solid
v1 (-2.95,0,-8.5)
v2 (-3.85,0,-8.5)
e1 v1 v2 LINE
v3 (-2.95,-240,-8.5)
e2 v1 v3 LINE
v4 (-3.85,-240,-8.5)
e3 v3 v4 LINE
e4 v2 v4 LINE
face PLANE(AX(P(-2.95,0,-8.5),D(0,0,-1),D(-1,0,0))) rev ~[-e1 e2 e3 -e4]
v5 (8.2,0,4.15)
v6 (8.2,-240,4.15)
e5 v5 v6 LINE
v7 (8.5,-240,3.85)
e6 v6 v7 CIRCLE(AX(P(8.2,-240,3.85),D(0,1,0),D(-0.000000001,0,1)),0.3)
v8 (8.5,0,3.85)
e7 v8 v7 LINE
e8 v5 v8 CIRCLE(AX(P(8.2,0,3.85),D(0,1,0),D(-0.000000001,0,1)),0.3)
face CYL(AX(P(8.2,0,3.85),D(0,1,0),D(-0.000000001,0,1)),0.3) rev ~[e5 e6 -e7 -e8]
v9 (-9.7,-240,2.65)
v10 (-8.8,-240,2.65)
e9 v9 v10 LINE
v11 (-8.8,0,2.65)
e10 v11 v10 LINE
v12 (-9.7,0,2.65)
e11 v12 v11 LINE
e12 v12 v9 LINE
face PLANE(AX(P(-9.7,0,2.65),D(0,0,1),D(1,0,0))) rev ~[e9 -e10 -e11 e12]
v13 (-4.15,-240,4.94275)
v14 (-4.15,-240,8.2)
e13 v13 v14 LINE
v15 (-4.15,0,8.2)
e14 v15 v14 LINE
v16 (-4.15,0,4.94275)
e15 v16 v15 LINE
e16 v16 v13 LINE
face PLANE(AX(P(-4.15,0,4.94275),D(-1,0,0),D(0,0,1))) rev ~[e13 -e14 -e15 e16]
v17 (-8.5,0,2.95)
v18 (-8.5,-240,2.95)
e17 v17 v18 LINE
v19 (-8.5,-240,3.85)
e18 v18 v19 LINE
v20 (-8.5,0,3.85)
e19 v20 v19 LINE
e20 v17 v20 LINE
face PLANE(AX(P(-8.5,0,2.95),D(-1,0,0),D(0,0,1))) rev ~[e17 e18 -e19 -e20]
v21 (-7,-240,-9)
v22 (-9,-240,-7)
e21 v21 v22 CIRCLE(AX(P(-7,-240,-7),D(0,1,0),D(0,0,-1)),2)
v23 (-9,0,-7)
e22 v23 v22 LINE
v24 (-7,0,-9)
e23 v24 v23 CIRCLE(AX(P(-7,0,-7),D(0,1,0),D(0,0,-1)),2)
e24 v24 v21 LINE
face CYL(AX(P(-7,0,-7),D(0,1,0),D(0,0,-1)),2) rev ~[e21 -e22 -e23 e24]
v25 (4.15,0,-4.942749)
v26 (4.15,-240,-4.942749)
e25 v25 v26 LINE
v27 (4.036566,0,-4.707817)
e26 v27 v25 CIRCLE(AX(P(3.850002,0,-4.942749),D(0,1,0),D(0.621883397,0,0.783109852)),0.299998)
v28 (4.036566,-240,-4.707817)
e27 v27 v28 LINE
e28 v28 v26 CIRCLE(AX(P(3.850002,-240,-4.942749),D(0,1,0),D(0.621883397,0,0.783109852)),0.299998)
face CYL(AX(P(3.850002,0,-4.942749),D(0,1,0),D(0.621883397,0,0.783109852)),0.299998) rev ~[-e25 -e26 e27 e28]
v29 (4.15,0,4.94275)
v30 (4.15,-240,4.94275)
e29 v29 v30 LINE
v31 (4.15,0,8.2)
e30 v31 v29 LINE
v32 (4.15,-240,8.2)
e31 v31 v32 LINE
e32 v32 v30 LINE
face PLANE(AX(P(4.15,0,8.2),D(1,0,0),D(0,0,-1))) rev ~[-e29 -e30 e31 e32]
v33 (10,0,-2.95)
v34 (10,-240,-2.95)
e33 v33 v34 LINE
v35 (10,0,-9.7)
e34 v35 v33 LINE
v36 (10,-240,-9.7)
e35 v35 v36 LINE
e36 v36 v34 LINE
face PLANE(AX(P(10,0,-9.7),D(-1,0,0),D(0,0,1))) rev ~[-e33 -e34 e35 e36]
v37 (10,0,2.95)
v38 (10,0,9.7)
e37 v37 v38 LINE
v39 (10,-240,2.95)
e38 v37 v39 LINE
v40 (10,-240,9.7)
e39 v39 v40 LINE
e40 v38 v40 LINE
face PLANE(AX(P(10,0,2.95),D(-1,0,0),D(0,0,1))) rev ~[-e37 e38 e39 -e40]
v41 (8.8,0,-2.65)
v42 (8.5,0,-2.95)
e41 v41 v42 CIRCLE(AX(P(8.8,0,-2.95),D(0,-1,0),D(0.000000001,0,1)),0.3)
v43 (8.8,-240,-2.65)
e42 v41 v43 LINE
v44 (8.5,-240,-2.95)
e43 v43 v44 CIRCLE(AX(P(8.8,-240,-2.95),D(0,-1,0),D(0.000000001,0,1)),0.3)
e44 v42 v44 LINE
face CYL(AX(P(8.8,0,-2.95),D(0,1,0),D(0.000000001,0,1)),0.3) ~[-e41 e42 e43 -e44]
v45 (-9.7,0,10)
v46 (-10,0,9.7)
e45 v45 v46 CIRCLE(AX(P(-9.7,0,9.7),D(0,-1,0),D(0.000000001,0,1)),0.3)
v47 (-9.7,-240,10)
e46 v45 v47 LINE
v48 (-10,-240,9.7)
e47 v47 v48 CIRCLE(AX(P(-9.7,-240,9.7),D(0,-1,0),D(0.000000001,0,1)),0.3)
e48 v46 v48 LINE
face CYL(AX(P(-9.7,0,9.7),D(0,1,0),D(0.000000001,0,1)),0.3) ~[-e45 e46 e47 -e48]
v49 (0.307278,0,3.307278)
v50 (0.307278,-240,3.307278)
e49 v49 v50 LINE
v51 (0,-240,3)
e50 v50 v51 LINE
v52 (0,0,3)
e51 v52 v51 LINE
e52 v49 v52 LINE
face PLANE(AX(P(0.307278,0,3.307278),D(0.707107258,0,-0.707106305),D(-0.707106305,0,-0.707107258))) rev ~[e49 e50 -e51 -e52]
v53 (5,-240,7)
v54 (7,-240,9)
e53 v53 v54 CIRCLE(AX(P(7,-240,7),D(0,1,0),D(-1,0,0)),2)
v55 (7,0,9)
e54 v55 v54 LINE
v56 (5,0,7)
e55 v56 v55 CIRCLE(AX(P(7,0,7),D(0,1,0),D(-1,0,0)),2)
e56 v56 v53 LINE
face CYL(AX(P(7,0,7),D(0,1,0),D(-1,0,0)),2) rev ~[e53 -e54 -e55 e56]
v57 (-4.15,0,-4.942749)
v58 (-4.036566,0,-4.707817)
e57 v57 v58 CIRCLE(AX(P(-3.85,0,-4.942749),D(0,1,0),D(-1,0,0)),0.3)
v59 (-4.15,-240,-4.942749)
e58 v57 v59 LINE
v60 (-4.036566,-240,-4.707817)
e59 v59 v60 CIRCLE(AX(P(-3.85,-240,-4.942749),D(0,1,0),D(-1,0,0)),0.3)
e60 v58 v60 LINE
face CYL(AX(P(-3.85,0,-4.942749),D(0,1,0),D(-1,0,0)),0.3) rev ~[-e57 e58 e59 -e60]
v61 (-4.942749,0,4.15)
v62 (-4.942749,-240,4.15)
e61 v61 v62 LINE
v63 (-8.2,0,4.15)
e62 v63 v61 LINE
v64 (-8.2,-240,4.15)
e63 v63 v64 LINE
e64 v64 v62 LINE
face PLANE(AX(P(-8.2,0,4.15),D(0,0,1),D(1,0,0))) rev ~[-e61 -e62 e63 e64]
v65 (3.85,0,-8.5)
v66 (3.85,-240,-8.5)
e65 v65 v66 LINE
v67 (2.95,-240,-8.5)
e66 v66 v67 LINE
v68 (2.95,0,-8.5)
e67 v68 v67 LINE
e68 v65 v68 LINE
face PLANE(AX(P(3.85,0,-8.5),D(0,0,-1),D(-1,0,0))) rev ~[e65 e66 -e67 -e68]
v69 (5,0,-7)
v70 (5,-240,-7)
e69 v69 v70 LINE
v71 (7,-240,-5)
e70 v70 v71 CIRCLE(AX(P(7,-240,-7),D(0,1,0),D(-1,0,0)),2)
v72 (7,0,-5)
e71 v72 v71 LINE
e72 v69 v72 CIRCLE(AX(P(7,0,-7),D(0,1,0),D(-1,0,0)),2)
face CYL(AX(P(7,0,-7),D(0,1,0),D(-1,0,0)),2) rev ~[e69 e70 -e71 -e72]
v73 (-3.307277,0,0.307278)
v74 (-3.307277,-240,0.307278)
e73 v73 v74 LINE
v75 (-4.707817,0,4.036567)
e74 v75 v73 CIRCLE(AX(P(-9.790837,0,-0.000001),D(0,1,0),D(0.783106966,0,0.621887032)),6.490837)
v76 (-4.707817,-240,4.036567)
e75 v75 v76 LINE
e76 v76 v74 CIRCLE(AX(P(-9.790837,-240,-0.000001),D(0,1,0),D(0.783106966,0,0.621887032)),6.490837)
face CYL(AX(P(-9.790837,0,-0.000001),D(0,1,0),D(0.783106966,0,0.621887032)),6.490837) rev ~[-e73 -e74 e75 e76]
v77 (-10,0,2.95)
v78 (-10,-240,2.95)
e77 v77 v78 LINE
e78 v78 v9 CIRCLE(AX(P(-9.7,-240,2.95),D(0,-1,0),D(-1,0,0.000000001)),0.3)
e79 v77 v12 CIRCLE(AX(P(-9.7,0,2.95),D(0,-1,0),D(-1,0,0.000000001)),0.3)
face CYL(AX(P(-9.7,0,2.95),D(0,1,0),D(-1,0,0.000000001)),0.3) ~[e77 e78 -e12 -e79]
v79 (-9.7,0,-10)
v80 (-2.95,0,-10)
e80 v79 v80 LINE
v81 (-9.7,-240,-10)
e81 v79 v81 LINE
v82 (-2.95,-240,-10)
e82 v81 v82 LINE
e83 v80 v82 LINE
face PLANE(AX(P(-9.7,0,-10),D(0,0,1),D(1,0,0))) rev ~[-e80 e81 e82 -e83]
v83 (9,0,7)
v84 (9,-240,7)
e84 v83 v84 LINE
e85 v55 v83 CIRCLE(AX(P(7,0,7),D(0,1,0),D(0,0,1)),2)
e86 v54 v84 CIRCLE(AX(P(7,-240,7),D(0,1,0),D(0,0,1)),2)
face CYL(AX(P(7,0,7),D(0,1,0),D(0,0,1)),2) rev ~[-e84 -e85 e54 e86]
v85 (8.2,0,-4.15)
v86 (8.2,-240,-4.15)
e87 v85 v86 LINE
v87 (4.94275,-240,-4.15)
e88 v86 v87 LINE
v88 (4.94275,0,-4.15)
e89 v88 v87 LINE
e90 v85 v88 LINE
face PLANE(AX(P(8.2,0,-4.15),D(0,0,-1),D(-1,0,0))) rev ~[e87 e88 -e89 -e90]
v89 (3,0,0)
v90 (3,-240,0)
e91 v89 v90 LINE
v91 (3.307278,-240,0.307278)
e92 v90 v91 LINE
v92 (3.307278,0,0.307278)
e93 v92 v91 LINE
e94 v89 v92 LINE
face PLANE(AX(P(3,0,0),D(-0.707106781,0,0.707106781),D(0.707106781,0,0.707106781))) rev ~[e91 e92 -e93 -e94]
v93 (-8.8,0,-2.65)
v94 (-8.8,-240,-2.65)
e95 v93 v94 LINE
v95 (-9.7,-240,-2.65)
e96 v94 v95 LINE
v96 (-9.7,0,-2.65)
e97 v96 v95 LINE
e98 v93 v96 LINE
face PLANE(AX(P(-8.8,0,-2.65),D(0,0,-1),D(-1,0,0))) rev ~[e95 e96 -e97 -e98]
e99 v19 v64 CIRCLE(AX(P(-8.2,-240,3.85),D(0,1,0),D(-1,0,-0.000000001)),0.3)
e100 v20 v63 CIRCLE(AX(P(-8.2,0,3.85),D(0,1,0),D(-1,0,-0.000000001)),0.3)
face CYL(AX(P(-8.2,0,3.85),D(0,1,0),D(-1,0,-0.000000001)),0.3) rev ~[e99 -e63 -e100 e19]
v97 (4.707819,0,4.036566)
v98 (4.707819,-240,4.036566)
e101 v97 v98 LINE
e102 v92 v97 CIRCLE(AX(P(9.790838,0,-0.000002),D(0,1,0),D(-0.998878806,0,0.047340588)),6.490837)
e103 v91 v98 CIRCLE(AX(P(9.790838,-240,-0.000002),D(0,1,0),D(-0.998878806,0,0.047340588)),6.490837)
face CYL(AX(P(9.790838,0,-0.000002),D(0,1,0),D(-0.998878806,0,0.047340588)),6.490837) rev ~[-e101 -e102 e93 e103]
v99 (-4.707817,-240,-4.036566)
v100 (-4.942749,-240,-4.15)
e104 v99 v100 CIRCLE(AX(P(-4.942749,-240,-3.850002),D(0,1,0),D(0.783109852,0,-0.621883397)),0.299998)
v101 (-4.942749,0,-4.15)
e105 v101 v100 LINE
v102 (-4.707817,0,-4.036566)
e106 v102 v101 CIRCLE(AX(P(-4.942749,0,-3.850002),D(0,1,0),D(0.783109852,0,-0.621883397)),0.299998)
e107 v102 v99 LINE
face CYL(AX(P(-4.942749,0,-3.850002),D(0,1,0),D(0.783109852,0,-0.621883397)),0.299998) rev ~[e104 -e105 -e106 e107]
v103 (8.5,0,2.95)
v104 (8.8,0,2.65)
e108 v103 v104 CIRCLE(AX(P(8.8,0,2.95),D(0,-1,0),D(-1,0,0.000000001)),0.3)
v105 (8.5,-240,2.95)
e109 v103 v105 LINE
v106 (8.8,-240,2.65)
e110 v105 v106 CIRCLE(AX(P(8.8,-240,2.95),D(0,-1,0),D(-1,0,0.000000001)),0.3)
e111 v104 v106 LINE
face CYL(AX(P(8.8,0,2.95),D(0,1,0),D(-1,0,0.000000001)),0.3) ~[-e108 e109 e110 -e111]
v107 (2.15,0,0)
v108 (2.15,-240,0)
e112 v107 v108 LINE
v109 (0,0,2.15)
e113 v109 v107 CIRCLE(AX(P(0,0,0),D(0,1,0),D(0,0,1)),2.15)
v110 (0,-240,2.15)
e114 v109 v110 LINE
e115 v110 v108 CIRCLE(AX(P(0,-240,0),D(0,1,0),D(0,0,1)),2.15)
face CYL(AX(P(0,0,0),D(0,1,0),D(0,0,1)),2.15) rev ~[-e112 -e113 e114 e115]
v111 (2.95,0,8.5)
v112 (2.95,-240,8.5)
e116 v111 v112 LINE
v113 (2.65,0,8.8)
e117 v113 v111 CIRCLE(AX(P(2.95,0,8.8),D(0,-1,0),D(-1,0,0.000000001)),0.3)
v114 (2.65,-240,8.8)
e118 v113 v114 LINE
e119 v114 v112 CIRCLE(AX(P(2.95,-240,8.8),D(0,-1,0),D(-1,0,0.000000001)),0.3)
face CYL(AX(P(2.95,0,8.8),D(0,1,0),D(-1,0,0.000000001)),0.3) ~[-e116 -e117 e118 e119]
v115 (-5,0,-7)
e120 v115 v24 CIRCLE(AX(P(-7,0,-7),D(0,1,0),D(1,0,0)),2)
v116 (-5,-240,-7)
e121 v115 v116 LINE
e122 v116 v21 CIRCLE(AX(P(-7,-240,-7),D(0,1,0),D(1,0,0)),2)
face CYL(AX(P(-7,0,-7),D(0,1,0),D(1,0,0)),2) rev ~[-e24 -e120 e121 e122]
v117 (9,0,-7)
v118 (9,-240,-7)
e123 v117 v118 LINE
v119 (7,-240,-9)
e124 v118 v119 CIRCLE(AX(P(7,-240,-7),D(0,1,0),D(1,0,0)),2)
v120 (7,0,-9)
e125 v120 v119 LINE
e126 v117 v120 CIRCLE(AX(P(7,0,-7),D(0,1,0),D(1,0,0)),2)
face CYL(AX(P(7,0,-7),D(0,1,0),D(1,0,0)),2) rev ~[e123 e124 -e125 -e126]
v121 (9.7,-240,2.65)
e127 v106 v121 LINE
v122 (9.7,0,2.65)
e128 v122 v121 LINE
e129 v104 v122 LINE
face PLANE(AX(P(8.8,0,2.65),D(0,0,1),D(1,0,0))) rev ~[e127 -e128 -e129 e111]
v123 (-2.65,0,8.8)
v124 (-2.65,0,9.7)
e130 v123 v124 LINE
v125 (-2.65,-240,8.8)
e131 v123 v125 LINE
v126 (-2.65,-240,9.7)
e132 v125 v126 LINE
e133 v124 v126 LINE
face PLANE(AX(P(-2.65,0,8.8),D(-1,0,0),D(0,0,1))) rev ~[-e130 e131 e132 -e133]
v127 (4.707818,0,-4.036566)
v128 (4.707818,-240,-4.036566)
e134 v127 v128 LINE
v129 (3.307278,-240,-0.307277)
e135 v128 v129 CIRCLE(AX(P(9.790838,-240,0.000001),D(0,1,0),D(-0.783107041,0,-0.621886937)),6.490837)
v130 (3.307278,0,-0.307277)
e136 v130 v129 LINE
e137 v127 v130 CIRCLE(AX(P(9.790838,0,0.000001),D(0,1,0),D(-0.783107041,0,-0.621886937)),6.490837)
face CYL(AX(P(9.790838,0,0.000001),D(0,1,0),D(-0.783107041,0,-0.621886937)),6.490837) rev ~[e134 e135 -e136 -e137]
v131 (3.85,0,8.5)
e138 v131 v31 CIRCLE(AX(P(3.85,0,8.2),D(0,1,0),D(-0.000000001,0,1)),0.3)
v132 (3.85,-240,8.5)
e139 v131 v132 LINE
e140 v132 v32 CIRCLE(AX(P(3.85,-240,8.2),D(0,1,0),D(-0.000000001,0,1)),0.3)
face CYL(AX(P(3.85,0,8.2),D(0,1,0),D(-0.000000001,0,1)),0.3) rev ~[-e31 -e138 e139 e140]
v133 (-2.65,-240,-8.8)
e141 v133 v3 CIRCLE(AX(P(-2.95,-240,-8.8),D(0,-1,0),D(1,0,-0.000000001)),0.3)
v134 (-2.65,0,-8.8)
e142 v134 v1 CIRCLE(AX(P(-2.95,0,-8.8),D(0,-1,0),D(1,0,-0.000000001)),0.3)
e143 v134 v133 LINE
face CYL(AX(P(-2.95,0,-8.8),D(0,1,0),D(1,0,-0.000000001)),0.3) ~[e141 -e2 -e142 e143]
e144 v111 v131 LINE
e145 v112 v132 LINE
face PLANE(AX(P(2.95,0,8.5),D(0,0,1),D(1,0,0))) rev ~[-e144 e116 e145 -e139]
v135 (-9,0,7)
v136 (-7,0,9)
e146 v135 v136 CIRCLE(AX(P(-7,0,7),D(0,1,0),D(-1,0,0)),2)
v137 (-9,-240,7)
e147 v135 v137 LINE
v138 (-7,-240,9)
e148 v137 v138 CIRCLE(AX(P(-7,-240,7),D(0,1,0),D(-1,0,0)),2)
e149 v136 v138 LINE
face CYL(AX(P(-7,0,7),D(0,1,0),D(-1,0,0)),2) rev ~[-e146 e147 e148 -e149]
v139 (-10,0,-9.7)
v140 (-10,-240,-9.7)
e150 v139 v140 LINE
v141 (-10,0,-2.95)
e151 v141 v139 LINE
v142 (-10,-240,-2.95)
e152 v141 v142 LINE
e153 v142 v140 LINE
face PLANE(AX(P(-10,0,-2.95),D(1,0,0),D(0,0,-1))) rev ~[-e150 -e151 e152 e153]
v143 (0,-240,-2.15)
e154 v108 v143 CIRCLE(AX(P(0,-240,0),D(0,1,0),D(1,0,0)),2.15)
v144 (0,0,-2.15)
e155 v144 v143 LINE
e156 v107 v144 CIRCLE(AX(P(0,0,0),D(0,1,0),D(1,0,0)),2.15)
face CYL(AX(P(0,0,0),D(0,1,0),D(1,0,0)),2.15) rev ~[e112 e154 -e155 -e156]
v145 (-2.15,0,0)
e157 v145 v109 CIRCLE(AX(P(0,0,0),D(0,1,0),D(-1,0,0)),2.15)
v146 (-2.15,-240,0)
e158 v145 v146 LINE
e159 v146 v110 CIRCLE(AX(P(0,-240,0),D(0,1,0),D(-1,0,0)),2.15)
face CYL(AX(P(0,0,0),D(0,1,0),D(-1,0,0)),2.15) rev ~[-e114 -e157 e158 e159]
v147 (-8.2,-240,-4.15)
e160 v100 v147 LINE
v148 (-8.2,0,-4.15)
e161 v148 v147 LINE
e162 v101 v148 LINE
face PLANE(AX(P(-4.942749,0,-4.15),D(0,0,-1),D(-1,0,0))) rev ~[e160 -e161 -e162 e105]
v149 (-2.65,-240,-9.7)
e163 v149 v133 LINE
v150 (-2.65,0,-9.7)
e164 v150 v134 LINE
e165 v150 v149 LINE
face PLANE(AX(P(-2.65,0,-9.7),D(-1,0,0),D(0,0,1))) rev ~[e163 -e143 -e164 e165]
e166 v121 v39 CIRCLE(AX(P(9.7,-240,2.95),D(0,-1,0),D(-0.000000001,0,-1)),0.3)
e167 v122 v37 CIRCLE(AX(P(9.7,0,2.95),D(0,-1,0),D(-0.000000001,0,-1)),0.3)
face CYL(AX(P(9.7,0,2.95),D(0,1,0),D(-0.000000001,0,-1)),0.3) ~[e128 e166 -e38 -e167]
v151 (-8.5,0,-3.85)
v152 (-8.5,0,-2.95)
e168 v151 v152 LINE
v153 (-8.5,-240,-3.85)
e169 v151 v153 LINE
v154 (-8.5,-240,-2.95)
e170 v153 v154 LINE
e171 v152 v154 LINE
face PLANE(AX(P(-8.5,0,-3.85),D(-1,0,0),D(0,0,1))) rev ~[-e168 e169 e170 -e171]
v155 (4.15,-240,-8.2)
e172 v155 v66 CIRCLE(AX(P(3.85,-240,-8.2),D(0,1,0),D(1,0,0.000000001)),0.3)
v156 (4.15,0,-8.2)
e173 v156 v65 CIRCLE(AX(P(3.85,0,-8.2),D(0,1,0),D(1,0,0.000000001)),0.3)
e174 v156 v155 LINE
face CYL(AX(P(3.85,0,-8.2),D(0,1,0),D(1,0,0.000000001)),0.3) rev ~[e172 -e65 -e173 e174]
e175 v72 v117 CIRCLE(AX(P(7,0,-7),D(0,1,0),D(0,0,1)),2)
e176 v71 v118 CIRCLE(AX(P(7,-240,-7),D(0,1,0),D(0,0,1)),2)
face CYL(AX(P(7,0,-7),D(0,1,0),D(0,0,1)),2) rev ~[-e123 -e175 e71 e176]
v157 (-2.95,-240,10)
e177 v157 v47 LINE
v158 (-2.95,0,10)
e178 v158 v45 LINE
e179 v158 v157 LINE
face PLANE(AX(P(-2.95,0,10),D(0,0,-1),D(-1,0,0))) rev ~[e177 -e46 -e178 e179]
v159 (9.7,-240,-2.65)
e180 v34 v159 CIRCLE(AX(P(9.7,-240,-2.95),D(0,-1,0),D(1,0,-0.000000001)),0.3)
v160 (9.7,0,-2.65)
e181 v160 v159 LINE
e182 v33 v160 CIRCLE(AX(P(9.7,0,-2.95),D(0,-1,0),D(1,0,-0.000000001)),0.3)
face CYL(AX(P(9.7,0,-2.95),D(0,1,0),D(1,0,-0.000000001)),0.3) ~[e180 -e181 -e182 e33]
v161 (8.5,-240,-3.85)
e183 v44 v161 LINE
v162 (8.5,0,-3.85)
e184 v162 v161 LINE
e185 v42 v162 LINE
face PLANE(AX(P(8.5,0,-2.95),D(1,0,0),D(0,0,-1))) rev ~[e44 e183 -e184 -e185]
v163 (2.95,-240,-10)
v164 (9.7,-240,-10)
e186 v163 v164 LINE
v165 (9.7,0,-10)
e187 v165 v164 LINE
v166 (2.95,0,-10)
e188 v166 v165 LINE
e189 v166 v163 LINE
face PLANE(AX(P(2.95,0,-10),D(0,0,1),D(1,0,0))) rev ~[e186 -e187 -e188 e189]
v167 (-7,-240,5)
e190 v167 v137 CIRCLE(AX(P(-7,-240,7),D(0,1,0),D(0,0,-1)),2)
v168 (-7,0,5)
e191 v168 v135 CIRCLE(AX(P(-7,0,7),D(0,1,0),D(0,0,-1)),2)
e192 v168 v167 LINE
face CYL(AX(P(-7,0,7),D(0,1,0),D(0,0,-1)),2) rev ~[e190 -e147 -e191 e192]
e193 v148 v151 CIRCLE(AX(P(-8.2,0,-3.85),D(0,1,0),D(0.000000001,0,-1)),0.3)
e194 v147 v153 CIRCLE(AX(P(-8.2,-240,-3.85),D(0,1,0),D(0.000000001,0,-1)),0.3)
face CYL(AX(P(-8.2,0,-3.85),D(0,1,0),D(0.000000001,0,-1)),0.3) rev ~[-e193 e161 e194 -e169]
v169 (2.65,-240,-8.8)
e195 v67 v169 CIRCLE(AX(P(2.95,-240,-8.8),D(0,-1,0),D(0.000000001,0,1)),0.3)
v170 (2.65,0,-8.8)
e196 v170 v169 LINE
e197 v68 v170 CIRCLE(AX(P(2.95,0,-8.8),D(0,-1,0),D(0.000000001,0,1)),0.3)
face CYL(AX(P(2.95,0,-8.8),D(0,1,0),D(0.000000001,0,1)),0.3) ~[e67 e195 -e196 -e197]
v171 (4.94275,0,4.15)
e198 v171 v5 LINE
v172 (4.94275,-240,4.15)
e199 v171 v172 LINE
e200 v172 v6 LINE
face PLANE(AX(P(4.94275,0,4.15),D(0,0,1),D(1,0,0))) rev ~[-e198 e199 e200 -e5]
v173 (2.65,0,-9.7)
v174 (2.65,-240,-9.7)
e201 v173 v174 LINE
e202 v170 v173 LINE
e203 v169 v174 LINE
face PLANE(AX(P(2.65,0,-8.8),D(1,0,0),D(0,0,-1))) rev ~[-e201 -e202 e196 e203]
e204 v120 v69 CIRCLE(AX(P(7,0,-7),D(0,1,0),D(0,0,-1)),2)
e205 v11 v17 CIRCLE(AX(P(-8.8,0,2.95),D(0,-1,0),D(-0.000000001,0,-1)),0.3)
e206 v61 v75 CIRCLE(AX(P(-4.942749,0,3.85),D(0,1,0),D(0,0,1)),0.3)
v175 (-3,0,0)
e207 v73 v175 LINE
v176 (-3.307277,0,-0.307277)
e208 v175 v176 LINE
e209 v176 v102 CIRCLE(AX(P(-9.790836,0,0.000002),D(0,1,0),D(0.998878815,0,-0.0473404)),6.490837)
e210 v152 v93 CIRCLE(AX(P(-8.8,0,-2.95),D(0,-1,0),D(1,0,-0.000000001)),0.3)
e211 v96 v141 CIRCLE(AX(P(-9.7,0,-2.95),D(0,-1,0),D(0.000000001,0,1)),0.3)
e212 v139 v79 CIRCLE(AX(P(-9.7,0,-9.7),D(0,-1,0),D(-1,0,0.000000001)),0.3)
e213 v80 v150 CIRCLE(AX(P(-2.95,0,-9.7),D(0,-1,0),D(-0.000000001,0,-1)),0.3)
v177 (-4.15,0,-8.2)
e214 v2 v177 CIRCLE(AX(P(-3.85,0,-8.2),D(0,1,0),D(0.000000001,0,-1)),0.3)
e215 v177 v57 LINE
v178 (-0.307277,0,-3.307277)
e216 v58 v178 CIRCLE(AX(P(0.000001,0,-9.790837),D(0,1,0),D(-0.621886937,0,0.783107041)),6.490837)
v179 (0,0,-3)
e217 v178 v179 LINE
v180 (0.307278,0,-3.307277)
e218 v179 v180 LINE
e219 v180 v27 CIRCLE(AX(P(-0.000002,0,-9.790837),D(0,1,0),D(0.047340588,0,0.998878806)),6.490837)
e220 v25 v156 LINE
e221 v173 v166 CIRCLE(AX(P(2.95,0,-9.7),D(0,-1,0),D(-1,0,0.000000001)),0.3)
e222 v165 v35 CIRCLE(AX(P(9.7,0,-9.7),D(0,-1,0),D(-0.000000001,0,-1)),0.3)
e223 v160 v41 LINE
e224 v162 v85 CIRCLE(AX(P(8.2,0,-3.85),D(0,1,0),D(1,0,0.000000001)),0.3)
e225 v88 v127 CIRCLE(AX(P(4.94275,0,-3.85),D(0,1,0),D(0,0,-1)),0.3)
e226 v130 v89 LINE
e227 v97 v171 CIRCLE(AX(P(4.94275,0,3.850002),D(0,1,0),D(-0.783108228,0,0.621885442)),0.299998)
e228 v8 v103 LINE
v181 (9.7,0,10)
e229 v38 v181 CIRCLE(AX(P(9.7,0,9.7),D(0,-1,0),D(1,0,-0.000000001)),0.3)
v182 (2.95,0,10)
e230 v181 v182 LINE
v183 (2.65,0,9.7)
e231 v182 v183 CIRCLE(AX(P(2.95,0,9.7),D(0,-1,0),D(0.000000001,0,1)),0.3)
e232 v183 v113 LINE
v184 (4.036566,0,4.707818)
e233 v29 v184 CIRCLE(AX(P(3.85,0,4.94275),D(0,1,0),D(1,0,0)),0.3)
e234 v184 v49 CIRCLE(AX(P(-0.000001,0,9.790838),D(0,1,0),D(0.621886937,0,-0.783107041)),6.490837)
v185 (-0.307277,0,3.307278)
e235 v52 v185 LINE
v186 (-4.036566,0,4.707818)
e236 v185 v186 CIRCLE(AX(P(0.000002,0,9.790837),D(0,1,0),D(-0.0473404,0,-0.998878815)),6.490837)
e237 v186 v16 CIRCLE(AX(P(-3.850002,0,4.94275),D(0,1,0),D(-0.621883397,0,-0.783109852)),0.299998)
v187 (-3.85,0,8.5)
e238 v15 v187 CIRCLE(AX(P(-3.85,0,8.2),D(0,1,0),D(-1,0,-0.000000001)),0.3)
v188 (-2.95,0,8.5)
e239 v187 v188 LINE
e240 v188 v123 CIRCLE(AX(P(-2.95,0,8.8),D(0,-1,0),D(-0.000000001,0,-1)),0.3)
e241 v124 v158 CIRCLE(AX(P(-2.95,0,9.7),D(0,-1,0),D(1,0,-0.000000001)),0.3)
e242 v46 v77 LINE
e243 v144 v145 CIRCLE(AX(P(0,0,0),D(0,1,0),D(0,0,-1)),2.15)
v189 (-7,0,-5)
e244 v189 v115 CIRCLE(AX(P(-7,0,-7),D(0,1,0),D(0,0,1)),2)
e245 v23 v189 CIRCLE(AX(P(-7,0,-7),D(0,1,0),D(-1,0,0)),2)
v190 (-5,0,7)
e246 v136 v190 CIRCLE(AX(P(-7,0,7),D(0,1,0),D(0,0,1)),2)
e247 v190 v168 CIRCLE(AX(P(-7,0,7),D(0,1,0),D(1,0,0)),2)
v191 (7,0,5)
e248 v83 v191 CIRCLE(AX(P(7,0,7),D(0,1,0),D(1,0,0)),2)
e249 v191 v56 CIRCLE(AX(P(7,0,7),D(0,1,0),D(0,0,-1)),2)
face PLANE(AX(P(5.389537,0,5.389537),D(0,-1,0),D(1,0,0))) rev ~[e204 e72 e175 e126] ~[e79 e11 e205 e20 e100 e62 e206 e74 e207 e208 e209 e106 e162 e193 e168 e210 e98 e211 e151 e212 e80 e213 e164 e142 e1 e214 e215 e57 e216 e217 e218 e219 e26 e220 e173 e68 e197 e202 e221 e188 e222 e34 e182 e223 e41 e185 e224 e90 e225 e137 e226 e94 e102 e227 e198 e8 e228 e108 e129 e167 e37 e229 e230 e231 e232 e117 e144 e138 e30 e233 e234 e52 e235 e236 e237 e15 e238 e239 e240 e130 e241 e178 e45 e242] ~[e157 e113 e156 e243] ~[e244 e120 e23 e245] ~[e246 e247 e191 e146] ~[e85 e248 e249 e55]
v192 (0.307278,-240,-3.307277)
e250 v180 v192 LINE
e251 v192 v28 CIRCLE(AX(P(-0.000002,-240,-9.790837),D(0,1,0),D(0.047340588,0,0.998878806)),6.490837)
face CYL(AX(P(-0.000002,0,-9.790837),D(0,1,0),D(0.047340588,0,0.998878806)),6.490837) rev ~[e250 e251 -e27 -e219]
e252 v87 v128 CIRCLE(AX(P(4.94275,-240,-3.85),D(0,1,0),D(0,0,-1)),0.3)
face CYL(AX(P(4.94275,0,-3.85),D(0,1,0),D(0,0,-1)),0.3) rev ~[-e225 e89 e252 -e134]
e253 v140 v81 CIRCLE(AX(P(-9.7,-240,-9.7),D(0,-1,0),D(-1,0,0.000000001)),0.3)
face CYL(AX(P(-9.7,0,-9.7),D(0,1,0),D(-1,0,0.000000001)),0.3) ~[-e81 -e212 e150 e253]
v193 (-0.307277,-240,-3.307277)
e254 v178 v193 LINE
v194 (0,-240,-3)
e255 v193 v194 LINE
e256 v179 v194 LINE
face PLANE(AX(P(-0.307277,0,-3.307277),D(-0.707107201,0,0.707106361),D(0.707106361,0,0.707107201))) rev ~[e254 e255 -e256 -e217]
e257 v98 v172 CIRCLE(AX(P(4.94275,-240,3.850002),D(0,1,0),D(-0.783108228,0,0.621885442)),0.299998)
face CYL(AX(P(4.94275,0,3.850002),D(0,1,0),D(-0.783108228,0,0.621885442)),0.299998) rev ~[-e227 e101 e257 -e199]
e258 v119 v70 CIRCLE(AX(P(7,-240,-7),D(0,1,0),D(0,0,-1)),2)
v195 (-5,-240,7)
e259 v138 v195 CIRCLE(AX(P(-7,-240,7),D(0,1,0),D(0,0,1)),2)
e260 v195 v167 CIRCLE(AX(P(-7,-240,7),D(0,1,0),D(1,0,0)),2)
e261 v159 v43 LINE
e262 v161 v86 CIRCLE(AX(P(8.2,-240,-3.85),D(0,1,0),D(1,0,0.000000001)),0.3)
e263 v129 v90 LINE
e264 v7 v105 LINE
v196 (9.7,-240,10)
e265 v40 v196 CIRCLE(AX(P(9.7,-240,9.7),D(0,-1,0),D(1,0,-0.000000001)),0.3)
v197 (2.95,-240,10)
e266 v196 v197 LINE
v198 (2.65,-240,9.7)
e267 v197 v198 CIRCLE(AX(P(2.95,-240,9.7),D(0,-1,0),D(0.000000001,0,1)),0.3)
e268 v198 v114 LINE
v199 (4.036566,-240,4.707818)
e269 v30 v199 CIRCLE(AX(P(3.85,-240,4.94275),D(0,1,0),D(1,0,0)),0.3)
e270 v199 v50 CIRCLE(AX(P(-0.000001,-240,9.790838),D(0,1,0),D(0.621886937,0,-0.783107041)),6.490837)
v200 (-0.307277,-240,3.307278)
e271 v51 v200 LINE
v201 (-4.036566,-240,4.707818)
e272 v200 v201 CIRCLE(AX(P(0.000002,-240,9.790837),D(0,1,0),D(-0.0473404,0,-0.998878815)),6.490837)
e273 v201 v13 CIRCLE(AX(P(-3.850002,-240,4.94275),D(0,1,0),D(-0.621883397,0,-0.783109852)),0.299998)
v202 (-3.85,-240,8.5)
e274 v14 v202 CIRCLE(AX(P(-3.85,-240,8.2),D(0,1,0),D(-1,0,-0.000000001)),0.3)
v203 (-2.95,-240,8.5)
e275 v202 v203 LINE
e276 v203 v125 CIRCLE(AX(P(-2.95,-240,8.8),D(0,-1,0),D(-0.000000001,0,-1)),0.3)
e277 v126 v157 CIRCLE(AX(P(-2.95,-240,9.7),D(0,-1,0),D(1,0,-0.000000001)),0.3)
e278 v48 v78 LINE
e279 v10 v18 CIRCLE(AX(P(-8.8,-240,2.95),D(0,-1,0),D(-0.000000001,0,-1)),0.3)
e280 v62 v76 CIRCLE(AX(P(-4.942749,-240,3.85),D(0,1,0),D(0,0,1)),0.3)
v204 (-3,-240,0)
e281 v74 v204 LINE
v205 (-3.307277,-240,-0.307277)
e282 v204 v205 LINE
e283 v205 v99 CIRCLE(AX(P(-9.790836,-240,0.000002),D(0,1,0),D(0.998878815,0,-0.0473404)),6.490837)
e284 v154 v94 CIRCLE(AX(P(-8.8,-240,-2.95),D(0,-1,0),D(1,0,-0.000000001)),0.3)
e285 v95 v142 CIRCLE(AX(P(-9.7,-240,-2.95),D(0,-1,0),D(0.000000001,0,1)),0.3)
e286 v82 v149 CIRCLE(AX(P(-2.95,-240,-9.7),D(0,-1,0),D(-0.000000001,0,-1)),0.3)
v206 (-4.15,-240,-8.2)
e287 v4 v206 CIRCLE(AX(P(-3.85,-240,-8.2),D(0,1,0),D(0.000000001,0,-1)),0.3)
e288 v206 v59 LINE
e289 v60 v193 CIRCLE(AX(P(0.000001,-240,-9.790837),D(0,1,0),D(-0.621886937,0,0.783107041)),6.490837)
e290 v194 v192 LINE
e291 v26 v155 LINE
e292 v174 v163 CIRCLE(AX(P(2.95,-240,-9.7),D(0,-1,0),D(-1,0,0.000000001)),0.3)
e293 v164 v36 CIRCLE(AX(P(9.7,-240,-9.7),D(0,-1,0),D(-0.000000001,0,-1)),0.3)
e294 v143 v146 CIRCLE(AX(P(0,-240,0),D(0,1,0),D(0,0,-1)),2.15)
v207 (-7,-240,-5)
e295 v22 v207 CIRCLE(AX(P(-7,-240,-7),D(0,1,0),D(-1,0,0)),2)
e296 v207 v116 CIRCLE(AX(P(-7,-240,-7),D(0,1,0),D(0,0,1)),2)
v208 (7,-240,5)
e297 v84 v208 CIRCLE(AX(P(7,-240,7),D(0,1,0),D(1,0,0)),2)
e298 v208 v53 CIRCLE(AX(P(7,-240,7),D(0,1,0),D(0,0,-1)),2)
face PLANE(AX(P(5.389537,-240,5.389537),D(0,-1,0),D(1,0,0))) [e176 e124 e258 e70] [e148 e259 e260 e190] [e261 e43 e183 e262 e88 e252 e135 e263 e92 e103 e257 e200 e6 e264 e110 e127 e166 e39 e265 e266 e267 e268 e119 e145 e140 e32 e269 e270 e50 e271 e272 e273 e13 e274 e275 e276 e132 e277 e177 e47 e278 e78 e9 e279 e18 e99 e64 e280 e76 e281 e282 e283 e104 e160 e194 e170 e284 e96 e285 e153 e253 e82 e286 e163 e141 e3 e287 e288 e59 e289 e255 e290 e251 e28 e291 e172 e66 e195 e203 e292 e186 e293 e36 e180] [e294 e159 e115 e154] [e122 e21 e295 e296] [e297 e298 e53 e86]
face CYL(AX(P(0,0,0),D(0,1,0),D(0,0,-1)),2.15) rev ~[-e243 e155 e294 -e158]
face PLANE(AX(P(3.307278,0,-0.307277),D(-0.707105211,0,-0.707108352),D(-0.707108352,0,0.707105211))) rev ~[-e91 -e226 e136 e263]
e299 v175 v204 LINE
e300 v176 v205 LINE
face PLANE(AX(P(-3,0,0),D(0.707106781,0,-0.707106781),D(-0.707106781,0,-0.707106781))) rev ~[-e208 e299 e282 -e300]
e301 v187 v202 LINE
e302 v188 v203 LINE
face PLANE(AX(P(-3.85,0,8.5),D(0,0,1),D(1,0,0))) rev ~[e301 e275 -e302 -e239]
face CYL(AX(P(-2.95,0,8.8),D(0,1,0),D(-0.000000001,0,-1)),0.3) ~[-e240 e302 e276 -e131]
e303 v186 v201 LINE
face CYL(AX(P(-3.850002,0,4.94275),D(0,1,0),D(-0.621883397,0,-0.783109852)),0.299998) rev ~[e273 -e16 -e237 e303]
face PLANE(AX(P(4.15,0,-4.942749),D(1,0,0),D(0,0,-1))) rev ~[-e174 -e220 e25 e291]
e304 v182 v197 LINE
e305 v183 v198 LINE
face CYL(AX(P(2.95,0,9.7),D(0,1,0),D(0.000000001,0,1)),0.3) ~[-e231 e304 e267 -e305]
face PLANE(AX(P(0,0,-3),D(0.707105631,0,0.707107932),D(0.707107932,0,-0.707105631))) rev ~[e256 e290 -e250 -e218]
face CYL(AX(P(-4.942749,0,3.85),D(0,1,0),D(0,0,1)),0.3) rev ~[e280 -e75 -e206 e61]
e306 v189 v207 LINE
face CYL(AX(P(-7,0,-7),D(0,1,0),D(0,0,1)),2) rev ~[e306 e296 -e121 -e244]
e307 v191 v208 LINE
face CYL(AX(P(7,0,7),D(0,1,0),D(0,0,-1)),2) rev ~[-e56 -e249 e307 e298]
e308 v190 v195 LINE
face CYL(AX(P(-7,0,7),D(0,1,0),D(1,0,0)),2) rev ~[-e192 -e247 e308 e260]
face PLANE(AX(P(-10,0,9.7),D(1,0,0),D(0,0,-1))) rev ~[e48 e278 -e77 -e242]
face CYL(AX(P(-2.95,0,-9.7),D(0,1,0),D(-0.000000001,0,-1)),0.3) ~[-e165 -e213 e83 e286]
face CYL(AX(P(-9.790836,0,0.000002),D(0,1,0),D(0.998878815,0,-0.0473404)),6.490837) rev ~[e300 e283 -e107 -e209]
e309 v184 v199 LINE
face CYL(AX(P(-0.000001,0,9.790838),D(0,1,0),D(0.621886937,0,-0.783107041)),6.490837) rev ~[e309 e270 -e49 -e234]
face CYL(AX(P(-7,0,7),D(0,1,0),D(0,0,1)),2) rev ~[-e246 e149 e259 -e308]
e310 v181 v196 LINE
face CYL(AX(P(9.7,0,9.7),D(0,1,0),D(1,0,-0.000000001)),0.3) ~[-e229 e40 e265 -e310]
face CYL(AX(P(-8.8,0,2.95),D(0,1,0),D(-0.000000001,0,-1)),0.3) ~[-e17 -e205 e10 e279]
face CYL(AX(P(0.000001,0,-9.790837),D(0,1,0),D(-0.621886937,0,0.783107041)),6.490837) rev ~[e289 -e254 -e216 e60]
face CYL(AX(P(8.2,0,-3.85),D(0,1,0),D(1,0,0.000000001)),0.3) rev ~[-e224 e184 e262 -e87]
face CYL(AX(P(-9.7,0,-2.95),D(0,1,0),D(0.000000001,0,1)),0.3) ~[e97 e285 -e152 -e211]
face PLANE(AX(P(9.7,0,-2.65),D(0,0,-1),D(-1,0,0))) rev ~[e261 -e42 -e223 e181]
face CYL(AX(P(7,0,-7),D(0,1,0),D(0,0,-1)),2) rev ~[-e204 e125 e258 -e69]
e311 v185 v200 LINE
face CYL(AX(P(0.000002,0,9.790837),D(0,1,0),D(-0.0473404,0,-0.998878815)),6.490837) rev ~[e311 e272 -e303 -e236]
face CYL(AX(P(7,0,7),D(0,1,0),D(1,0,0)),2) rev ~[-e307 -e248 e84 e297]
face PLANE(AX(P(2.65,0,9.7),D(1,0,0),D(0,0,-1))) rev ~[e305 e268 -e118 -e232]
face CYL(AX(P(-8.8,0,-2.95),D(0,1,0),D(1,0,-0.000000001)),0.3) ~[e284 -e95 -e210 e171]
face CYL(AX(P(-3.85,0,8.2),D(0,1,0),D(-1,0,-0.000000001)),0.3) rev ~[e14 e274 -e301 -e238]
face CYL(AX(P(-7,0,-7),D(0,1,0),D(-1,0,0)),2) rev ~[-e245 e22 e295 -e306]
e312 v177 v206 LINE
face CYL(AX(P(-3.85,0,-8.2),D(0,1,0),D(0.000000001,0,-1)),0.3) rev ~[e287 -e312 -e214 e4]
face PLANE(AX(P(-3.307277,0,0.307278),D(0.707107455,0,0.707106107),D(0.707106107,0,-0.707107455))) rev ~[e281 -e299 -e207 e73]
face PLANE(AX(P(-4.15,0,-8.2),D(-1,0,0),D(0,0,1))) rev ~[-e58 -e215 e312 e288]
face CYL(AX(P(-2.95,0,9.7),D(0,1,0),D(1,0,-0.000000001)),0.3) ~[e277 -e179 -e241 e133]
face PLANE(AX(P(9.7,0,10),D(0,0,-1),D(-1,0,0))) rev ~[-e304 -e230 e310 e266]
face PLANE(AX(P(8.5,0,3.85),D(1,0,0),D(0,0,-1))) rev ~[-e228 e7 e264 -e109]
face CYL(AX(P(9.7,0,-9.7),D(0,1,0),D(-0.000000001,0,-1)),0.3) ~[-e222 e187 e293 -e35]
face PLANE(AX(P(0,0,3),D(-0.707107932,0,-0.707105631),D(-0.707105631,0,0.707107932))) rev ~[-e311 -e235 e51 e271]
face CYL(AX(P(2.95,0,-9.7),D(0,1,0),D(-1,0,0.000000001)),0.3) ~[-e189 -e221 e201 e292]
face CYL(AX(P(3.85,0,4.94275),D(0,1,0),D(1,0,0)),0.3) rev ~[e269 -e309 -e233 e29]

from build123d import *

# Parameters (mm, degrees)
F1_DEPTH = 240


# Not quite as in the source:
# - ends of sketch curves that miss each other by under 0.0002 mm in the source are joined


with BuildPart() as f1:
    # F0 (on Front) → F1 (new body)
    with BuildSketch(Plane.XZ):
        with BuildLine():
            ThreePointArc((0, 2.15), (1.5202795796, 1.5202795796), (2.15, 0))
            Line((2.15, 0), (3, 0))
            Line((3, 0), (3.307278, 0.307278))
            ThreePointArc((3.307278, 0.307278), (3.7143803747, 2.2820219924), (4.7078187099, 4.0365664363))
            ThreePointArc((4.7078187099, 4.0365664363), (4.812308461, 4.1201573706), (4.94275, 4.15))
            Line((4.94275, 4.15), (8.2, 4.15))
            ThreePointArc((8.2, 4.15), (8.4121320344, 4.0621320344), (8.5, 3.85))
            Line((8.5, 3.85), (8.5, 2.95))
            ThreePointArc((8.5, 2.95), (8.5878679656, 2.7378679656), (8.8, 2.65))
            Line((8.8, 2.65), (9.7, 2.65))
            ThreePointArc((9.7, 2.65), (9.9121320344, 2.7378679656), (10, 2.95))
            Line((10, 2.95), (10, 9.7))
            ThreePointArc((10, 9.7), (9.9121320344, 9.9121320344), (9.7, 10))
            Line((9.7, 10), (2.95, 10))
            ThreePointArc((2.95, 10), (2.7378679656, 9.9121320344), (2.65, 9.7))
            Line((2.65, 9.7), (2.65, 8.8))
            ThreePointArc((2.65, 8.8), (2.7378679656, 8.5878679656), (2.95, 8.5))
            Line((2.95, 8.5), (3.85, 8.5))
            ThreePointArc((3.85, 8.5), (4.0621320344, 8.4121320344), (4.15, 8.2))
            Line((4.15, 8.2), (4.15, 4.94275))
            ThreePointArc((4.15, 4.94275), (4.1201572004, 4.8123081084), (4.036566086, 4.7078178916))
            ThreePointArc((4.036566086, 4.7078178916), (2.2820216259, 3.7143802371), (0.3072779813, 3.3072783955))
            Line((0.3072779813, 3.3072783955), (0, 3))
            Line((0, 3), (0, 2.15))
        make_face()
        with BuildLine():
            ThreePointArc((7, 9), (8.4142135624, 8.4142135624), (9, 7))
            ThreePointArc((9, 7), (8.4142135624, 5.5857864376), (7, 5))
            ThreePointArc((7, 5), (5.5857864376, 5.5857864376), (5, 7))
            ThreePointArc((5, 7), (5.5857864376, 8.4142135624), (7, 9))
        make_face(mode=Mode.SUBTRACT)
        with BuildLine():
            Line((3, 0), (2.15, 0))
            ThreePointArc((2.15, 0), (1.5202795796, -1.5202795796), (0, -2.15))
            Line((0, -2.15), (0, -3))
            Line((0, -3), (0.307278, -3.307277))
            ThreePointArc((0.307278, -3.307277), (2.2820216259, -3.7143792371), (4.036565823, -4.7078172229))
            ThreePointArc((4.036565823, -4.7078172229), (4.1201572004, -4.8123071084), (4.15, -4.942749))
            Line((4.15, -4.942749), (4.15, -8.2))
            ThreePointArc((4.15, -8.2), (4.0621320344, -8.4121320344), (3.85, -8.5))
            Line((3.85, -8.5), (2.95, -8.5))
            ThreePointArc((2.95, -8.5), (2.7378679656, -8.5878679656), (2.65, -8.8))
            Line((2.65, -8.8), (2.65, -9.7))
            ThreePointArc((2.65, -9.7), (2.7378679656, -9.9121320344), (2.95, -10))
            Line((2.95, -10), (9.7, -10))
            ThreePointArc((9.7, -10), (9.9121320344, -9.9121320344), (10, -9.7))
            Line((10, -9.7), (10, -2.95))
            ThreePointArc((10, -2.95), (9.9121320344, -2.7378679656), (9.7, -2.65))
            Line((9.7, -2.65), (8.8, -2.65))
            ThreePointArc((8.8, -2.65), (8.5878679656, -2.7378679656), (8.5, -2.95))
            Line((8.5, -2.95), (8.5, -3.85))
            ThreePointArc((8.5, -3.85), (8.4121320344, -4.0621320344), (8.2, -4.15))
            Line((8.2, -4.15), (4.94275, -4.15))
            ThreePointArc((4.94275, -4.15), (4.8123081084, -4.1201572004), (4.7078178916, -4.036566086))
            ThreePointArc((4.7078178916, -4.036566086), (3.7143800615, -2.2820211583), (3.3072783483, -0.3072769835))
            Line((3.3072783483, -0.3072769835), (3, 0))
        make_face()
        with BuildLine():
            ThreePointArc((7, -5), (8.4142135624, -5.5857864376), (9, -7))
            ThreePointArc((9, -7), (8.4142135624, -8.4142135624), (7, -9))
            ThreePointArc((7, -9), (5.5857864376, -8.4142135624), (5, -7))
            ThreePointArc((5, -7), (5.5857864376, -5.5857864376), (7, -5))
        make_face(mode=Mode.SUBTRACT)
        with BuildLine():
            ThreePointArc((-2.15, 0), (-1.5202795796, 1.5202795796), (0, 2.15))
            Line((0, 2.15), (0, 3))
            Line((0, 3), (-0.307277, 3.307278))
            ThreePointArc((-0.307277, 3.307278), (-2.2820211583, 3.7143800615), (-4.036565823, 4.7078182229))
            ThreePointArc((-4.036565823, 4.7078182229), (-4.1201572004, 4.8123081084), (-4.15, 4.94275))
            Line((-4.15, 4.94275), (-4.15, 8.2))
            ThreePointArc((-4.15, 8.2), (-4.0621320344, 8.4121320344), (-3.85, 8.5))
            Line((-3.85, 8.5), (-2.95, 8.5))
            ThreePointArc((-2.95, 8.5), (-2.7378679656, 8.5878679656), (-2.65, 8.8))
            Line((-2.65, 8.8), (-2.65, 9.7))
            ThreePointArc((-2.65, 9.7), (-2.7378679656, 9.9121320344), (-2.95, 10))
            Line((-2.95, 10), (-9.7, 10))
            ThreePointArc((-9.7, 10), (-9.9121320344, 9.9121320344), (-10, 9.7))
            Line((-10, 9.7), (-10, 2.95))
            ThreePointArc((-10, 2.95), (-9.9121320344, 2.7378679656), (-9.7, 2.65))
            Line((-9.7, 2.65), (-8.8, 2.65))
            ThreePointArc((-8.8, 2.65), (-8.5878679656, 2.7378679656), (-8.5, 2.95))
            Line((-8.5, 2.95), (-8.5, 3.85))
            ThreePointArc((-8.5, 3.85), (-8.4121320344, 4.0621320344), (-8.2, 4.15))
            Line((-8.2, 4.15), (-4.942749, 4.15))
            ThreePointArc((-4.942749, 4.15), (-4.812307461, 4.1201573706), (-4.7078173786, 4.0365666993))
            ThreePointArc((-4.7078173786, 4.0365666993), (-3.7143793747, 2.2820219924), (-3.3072773955, 0.3072779813))
            Line((-3.3072773955, 0.3072779813), (-3, 0))
            Line((-3, 0), (-2.15, 0))
        make_face()
        with BuildLine():
            ThreePointArc((-7, 5), (-8.4142135624, 5.5857864376), (-9, 7))
            ThreePointArc((-9, 7), (-8.4142135624, 8.4142135624), (-7, 9))
            ThreePointArc((-7, 9), (-5.5857864376, 8.4142135624), (-5, 7))
            ThreePointArc((-5, 7), (-5.5857864376, 5.5857864376), (-7, 5))
        make_face(mode=Mode.SUBTRACT)
        with BuildLine():
            Line((0, -3), (0, -2.15))
            ThreePointArc((0, -2.15), (-1.5202795796, -1.5202795796), (-2.15, 0))
            Line((-2.15, 0), (-3, 0))
            Line((-3, 0), (-3.307277, -0.307277))
            ThreePointArc((-3.307277, -0.307277), (-3.7143790615, -2.2820211583), (-4.7078172229, -4.036565823))
            ThreePointArc((-4.7078172229, -4.036565823), (-4.8123071084, -4.1201572004), (-4.942749, -4.15))
            Line((-4.942749, -4.15), (-8.2, -4.15))
            ThreePointArc((-8.2, -4.15), (-8.4121320344, -4.0621320344), (-8.5, -3.85))
            Line((-8.5, -3.85), (-8.5, -2.95))
            ThreePointArc((-8.5, -2.95), (-8.5878679656, -2.7378679656), (-8.8, -2.65))
            Line((-8.8, -2.65), (-9.7, -2.65))
            ThreePointArc((-9.7, -2.65), (-9.9121320344, -2.7378679656), (-10, -2.95))
            Line((-10, -2.95), (-10, -9.7))
            ThreePointArc((-10, -9.7), (-9.9121320344, -9.9121320344), (-9.7, -10))
            Line((-9.7, -10), (-2.95, -10))
            ThreePointArc((-2.95, -10), (-2.7378679656, -9.9121320344), (-2.65, -9.7))
            Line((-2.65, -9.7), (-2.65, -8.8))
            ThreePointArc((-2.65, -8.8), (-2.7378679656, -8.5878679656), (-2.95, -8.5))
            Line((-2.95, -8.5), (-3.85, -8.5))
            ThreePointArc((-3.85, -8.5), (-4.0621320344, -8.4121320344), (-4.15, -8.2))
            Line((-4.15, -8.2), (-4.15, -4.942749))
            ThreePointArc((-4.15, -4.942749), (-4.1201572004, -4.8123071084), (-4.036566086, -4.7078168916))
            ThreePointArc((-4.036566086, -4.7078168916), (-2.2820211583, -3.7143790615), (-0.3072769835, -3.3072773483))
            Line((-0.3072769835, -3.3072773483), (0, -3))
        make_face()
        with BuildLine():
            ThreePointArc((-7, -9), (-8.4142135624, -8.4142135624), (-9, -7))
            ThreePointArc((-9, -7), (-8.4142135624, -5.5857864376), (-7, -5))
            ThreePointArc((-7, -5), (-5.5857864376, -5.5857864376), (-5, -7))
            ThreePointArc((-5, -7), (-5.5857864376, -8.4142135624), (-7, -9))
        make_face(mode=Mode.SUBTRACT)
    extrude(amount=F1_DEPTH)


solid = f1.part
